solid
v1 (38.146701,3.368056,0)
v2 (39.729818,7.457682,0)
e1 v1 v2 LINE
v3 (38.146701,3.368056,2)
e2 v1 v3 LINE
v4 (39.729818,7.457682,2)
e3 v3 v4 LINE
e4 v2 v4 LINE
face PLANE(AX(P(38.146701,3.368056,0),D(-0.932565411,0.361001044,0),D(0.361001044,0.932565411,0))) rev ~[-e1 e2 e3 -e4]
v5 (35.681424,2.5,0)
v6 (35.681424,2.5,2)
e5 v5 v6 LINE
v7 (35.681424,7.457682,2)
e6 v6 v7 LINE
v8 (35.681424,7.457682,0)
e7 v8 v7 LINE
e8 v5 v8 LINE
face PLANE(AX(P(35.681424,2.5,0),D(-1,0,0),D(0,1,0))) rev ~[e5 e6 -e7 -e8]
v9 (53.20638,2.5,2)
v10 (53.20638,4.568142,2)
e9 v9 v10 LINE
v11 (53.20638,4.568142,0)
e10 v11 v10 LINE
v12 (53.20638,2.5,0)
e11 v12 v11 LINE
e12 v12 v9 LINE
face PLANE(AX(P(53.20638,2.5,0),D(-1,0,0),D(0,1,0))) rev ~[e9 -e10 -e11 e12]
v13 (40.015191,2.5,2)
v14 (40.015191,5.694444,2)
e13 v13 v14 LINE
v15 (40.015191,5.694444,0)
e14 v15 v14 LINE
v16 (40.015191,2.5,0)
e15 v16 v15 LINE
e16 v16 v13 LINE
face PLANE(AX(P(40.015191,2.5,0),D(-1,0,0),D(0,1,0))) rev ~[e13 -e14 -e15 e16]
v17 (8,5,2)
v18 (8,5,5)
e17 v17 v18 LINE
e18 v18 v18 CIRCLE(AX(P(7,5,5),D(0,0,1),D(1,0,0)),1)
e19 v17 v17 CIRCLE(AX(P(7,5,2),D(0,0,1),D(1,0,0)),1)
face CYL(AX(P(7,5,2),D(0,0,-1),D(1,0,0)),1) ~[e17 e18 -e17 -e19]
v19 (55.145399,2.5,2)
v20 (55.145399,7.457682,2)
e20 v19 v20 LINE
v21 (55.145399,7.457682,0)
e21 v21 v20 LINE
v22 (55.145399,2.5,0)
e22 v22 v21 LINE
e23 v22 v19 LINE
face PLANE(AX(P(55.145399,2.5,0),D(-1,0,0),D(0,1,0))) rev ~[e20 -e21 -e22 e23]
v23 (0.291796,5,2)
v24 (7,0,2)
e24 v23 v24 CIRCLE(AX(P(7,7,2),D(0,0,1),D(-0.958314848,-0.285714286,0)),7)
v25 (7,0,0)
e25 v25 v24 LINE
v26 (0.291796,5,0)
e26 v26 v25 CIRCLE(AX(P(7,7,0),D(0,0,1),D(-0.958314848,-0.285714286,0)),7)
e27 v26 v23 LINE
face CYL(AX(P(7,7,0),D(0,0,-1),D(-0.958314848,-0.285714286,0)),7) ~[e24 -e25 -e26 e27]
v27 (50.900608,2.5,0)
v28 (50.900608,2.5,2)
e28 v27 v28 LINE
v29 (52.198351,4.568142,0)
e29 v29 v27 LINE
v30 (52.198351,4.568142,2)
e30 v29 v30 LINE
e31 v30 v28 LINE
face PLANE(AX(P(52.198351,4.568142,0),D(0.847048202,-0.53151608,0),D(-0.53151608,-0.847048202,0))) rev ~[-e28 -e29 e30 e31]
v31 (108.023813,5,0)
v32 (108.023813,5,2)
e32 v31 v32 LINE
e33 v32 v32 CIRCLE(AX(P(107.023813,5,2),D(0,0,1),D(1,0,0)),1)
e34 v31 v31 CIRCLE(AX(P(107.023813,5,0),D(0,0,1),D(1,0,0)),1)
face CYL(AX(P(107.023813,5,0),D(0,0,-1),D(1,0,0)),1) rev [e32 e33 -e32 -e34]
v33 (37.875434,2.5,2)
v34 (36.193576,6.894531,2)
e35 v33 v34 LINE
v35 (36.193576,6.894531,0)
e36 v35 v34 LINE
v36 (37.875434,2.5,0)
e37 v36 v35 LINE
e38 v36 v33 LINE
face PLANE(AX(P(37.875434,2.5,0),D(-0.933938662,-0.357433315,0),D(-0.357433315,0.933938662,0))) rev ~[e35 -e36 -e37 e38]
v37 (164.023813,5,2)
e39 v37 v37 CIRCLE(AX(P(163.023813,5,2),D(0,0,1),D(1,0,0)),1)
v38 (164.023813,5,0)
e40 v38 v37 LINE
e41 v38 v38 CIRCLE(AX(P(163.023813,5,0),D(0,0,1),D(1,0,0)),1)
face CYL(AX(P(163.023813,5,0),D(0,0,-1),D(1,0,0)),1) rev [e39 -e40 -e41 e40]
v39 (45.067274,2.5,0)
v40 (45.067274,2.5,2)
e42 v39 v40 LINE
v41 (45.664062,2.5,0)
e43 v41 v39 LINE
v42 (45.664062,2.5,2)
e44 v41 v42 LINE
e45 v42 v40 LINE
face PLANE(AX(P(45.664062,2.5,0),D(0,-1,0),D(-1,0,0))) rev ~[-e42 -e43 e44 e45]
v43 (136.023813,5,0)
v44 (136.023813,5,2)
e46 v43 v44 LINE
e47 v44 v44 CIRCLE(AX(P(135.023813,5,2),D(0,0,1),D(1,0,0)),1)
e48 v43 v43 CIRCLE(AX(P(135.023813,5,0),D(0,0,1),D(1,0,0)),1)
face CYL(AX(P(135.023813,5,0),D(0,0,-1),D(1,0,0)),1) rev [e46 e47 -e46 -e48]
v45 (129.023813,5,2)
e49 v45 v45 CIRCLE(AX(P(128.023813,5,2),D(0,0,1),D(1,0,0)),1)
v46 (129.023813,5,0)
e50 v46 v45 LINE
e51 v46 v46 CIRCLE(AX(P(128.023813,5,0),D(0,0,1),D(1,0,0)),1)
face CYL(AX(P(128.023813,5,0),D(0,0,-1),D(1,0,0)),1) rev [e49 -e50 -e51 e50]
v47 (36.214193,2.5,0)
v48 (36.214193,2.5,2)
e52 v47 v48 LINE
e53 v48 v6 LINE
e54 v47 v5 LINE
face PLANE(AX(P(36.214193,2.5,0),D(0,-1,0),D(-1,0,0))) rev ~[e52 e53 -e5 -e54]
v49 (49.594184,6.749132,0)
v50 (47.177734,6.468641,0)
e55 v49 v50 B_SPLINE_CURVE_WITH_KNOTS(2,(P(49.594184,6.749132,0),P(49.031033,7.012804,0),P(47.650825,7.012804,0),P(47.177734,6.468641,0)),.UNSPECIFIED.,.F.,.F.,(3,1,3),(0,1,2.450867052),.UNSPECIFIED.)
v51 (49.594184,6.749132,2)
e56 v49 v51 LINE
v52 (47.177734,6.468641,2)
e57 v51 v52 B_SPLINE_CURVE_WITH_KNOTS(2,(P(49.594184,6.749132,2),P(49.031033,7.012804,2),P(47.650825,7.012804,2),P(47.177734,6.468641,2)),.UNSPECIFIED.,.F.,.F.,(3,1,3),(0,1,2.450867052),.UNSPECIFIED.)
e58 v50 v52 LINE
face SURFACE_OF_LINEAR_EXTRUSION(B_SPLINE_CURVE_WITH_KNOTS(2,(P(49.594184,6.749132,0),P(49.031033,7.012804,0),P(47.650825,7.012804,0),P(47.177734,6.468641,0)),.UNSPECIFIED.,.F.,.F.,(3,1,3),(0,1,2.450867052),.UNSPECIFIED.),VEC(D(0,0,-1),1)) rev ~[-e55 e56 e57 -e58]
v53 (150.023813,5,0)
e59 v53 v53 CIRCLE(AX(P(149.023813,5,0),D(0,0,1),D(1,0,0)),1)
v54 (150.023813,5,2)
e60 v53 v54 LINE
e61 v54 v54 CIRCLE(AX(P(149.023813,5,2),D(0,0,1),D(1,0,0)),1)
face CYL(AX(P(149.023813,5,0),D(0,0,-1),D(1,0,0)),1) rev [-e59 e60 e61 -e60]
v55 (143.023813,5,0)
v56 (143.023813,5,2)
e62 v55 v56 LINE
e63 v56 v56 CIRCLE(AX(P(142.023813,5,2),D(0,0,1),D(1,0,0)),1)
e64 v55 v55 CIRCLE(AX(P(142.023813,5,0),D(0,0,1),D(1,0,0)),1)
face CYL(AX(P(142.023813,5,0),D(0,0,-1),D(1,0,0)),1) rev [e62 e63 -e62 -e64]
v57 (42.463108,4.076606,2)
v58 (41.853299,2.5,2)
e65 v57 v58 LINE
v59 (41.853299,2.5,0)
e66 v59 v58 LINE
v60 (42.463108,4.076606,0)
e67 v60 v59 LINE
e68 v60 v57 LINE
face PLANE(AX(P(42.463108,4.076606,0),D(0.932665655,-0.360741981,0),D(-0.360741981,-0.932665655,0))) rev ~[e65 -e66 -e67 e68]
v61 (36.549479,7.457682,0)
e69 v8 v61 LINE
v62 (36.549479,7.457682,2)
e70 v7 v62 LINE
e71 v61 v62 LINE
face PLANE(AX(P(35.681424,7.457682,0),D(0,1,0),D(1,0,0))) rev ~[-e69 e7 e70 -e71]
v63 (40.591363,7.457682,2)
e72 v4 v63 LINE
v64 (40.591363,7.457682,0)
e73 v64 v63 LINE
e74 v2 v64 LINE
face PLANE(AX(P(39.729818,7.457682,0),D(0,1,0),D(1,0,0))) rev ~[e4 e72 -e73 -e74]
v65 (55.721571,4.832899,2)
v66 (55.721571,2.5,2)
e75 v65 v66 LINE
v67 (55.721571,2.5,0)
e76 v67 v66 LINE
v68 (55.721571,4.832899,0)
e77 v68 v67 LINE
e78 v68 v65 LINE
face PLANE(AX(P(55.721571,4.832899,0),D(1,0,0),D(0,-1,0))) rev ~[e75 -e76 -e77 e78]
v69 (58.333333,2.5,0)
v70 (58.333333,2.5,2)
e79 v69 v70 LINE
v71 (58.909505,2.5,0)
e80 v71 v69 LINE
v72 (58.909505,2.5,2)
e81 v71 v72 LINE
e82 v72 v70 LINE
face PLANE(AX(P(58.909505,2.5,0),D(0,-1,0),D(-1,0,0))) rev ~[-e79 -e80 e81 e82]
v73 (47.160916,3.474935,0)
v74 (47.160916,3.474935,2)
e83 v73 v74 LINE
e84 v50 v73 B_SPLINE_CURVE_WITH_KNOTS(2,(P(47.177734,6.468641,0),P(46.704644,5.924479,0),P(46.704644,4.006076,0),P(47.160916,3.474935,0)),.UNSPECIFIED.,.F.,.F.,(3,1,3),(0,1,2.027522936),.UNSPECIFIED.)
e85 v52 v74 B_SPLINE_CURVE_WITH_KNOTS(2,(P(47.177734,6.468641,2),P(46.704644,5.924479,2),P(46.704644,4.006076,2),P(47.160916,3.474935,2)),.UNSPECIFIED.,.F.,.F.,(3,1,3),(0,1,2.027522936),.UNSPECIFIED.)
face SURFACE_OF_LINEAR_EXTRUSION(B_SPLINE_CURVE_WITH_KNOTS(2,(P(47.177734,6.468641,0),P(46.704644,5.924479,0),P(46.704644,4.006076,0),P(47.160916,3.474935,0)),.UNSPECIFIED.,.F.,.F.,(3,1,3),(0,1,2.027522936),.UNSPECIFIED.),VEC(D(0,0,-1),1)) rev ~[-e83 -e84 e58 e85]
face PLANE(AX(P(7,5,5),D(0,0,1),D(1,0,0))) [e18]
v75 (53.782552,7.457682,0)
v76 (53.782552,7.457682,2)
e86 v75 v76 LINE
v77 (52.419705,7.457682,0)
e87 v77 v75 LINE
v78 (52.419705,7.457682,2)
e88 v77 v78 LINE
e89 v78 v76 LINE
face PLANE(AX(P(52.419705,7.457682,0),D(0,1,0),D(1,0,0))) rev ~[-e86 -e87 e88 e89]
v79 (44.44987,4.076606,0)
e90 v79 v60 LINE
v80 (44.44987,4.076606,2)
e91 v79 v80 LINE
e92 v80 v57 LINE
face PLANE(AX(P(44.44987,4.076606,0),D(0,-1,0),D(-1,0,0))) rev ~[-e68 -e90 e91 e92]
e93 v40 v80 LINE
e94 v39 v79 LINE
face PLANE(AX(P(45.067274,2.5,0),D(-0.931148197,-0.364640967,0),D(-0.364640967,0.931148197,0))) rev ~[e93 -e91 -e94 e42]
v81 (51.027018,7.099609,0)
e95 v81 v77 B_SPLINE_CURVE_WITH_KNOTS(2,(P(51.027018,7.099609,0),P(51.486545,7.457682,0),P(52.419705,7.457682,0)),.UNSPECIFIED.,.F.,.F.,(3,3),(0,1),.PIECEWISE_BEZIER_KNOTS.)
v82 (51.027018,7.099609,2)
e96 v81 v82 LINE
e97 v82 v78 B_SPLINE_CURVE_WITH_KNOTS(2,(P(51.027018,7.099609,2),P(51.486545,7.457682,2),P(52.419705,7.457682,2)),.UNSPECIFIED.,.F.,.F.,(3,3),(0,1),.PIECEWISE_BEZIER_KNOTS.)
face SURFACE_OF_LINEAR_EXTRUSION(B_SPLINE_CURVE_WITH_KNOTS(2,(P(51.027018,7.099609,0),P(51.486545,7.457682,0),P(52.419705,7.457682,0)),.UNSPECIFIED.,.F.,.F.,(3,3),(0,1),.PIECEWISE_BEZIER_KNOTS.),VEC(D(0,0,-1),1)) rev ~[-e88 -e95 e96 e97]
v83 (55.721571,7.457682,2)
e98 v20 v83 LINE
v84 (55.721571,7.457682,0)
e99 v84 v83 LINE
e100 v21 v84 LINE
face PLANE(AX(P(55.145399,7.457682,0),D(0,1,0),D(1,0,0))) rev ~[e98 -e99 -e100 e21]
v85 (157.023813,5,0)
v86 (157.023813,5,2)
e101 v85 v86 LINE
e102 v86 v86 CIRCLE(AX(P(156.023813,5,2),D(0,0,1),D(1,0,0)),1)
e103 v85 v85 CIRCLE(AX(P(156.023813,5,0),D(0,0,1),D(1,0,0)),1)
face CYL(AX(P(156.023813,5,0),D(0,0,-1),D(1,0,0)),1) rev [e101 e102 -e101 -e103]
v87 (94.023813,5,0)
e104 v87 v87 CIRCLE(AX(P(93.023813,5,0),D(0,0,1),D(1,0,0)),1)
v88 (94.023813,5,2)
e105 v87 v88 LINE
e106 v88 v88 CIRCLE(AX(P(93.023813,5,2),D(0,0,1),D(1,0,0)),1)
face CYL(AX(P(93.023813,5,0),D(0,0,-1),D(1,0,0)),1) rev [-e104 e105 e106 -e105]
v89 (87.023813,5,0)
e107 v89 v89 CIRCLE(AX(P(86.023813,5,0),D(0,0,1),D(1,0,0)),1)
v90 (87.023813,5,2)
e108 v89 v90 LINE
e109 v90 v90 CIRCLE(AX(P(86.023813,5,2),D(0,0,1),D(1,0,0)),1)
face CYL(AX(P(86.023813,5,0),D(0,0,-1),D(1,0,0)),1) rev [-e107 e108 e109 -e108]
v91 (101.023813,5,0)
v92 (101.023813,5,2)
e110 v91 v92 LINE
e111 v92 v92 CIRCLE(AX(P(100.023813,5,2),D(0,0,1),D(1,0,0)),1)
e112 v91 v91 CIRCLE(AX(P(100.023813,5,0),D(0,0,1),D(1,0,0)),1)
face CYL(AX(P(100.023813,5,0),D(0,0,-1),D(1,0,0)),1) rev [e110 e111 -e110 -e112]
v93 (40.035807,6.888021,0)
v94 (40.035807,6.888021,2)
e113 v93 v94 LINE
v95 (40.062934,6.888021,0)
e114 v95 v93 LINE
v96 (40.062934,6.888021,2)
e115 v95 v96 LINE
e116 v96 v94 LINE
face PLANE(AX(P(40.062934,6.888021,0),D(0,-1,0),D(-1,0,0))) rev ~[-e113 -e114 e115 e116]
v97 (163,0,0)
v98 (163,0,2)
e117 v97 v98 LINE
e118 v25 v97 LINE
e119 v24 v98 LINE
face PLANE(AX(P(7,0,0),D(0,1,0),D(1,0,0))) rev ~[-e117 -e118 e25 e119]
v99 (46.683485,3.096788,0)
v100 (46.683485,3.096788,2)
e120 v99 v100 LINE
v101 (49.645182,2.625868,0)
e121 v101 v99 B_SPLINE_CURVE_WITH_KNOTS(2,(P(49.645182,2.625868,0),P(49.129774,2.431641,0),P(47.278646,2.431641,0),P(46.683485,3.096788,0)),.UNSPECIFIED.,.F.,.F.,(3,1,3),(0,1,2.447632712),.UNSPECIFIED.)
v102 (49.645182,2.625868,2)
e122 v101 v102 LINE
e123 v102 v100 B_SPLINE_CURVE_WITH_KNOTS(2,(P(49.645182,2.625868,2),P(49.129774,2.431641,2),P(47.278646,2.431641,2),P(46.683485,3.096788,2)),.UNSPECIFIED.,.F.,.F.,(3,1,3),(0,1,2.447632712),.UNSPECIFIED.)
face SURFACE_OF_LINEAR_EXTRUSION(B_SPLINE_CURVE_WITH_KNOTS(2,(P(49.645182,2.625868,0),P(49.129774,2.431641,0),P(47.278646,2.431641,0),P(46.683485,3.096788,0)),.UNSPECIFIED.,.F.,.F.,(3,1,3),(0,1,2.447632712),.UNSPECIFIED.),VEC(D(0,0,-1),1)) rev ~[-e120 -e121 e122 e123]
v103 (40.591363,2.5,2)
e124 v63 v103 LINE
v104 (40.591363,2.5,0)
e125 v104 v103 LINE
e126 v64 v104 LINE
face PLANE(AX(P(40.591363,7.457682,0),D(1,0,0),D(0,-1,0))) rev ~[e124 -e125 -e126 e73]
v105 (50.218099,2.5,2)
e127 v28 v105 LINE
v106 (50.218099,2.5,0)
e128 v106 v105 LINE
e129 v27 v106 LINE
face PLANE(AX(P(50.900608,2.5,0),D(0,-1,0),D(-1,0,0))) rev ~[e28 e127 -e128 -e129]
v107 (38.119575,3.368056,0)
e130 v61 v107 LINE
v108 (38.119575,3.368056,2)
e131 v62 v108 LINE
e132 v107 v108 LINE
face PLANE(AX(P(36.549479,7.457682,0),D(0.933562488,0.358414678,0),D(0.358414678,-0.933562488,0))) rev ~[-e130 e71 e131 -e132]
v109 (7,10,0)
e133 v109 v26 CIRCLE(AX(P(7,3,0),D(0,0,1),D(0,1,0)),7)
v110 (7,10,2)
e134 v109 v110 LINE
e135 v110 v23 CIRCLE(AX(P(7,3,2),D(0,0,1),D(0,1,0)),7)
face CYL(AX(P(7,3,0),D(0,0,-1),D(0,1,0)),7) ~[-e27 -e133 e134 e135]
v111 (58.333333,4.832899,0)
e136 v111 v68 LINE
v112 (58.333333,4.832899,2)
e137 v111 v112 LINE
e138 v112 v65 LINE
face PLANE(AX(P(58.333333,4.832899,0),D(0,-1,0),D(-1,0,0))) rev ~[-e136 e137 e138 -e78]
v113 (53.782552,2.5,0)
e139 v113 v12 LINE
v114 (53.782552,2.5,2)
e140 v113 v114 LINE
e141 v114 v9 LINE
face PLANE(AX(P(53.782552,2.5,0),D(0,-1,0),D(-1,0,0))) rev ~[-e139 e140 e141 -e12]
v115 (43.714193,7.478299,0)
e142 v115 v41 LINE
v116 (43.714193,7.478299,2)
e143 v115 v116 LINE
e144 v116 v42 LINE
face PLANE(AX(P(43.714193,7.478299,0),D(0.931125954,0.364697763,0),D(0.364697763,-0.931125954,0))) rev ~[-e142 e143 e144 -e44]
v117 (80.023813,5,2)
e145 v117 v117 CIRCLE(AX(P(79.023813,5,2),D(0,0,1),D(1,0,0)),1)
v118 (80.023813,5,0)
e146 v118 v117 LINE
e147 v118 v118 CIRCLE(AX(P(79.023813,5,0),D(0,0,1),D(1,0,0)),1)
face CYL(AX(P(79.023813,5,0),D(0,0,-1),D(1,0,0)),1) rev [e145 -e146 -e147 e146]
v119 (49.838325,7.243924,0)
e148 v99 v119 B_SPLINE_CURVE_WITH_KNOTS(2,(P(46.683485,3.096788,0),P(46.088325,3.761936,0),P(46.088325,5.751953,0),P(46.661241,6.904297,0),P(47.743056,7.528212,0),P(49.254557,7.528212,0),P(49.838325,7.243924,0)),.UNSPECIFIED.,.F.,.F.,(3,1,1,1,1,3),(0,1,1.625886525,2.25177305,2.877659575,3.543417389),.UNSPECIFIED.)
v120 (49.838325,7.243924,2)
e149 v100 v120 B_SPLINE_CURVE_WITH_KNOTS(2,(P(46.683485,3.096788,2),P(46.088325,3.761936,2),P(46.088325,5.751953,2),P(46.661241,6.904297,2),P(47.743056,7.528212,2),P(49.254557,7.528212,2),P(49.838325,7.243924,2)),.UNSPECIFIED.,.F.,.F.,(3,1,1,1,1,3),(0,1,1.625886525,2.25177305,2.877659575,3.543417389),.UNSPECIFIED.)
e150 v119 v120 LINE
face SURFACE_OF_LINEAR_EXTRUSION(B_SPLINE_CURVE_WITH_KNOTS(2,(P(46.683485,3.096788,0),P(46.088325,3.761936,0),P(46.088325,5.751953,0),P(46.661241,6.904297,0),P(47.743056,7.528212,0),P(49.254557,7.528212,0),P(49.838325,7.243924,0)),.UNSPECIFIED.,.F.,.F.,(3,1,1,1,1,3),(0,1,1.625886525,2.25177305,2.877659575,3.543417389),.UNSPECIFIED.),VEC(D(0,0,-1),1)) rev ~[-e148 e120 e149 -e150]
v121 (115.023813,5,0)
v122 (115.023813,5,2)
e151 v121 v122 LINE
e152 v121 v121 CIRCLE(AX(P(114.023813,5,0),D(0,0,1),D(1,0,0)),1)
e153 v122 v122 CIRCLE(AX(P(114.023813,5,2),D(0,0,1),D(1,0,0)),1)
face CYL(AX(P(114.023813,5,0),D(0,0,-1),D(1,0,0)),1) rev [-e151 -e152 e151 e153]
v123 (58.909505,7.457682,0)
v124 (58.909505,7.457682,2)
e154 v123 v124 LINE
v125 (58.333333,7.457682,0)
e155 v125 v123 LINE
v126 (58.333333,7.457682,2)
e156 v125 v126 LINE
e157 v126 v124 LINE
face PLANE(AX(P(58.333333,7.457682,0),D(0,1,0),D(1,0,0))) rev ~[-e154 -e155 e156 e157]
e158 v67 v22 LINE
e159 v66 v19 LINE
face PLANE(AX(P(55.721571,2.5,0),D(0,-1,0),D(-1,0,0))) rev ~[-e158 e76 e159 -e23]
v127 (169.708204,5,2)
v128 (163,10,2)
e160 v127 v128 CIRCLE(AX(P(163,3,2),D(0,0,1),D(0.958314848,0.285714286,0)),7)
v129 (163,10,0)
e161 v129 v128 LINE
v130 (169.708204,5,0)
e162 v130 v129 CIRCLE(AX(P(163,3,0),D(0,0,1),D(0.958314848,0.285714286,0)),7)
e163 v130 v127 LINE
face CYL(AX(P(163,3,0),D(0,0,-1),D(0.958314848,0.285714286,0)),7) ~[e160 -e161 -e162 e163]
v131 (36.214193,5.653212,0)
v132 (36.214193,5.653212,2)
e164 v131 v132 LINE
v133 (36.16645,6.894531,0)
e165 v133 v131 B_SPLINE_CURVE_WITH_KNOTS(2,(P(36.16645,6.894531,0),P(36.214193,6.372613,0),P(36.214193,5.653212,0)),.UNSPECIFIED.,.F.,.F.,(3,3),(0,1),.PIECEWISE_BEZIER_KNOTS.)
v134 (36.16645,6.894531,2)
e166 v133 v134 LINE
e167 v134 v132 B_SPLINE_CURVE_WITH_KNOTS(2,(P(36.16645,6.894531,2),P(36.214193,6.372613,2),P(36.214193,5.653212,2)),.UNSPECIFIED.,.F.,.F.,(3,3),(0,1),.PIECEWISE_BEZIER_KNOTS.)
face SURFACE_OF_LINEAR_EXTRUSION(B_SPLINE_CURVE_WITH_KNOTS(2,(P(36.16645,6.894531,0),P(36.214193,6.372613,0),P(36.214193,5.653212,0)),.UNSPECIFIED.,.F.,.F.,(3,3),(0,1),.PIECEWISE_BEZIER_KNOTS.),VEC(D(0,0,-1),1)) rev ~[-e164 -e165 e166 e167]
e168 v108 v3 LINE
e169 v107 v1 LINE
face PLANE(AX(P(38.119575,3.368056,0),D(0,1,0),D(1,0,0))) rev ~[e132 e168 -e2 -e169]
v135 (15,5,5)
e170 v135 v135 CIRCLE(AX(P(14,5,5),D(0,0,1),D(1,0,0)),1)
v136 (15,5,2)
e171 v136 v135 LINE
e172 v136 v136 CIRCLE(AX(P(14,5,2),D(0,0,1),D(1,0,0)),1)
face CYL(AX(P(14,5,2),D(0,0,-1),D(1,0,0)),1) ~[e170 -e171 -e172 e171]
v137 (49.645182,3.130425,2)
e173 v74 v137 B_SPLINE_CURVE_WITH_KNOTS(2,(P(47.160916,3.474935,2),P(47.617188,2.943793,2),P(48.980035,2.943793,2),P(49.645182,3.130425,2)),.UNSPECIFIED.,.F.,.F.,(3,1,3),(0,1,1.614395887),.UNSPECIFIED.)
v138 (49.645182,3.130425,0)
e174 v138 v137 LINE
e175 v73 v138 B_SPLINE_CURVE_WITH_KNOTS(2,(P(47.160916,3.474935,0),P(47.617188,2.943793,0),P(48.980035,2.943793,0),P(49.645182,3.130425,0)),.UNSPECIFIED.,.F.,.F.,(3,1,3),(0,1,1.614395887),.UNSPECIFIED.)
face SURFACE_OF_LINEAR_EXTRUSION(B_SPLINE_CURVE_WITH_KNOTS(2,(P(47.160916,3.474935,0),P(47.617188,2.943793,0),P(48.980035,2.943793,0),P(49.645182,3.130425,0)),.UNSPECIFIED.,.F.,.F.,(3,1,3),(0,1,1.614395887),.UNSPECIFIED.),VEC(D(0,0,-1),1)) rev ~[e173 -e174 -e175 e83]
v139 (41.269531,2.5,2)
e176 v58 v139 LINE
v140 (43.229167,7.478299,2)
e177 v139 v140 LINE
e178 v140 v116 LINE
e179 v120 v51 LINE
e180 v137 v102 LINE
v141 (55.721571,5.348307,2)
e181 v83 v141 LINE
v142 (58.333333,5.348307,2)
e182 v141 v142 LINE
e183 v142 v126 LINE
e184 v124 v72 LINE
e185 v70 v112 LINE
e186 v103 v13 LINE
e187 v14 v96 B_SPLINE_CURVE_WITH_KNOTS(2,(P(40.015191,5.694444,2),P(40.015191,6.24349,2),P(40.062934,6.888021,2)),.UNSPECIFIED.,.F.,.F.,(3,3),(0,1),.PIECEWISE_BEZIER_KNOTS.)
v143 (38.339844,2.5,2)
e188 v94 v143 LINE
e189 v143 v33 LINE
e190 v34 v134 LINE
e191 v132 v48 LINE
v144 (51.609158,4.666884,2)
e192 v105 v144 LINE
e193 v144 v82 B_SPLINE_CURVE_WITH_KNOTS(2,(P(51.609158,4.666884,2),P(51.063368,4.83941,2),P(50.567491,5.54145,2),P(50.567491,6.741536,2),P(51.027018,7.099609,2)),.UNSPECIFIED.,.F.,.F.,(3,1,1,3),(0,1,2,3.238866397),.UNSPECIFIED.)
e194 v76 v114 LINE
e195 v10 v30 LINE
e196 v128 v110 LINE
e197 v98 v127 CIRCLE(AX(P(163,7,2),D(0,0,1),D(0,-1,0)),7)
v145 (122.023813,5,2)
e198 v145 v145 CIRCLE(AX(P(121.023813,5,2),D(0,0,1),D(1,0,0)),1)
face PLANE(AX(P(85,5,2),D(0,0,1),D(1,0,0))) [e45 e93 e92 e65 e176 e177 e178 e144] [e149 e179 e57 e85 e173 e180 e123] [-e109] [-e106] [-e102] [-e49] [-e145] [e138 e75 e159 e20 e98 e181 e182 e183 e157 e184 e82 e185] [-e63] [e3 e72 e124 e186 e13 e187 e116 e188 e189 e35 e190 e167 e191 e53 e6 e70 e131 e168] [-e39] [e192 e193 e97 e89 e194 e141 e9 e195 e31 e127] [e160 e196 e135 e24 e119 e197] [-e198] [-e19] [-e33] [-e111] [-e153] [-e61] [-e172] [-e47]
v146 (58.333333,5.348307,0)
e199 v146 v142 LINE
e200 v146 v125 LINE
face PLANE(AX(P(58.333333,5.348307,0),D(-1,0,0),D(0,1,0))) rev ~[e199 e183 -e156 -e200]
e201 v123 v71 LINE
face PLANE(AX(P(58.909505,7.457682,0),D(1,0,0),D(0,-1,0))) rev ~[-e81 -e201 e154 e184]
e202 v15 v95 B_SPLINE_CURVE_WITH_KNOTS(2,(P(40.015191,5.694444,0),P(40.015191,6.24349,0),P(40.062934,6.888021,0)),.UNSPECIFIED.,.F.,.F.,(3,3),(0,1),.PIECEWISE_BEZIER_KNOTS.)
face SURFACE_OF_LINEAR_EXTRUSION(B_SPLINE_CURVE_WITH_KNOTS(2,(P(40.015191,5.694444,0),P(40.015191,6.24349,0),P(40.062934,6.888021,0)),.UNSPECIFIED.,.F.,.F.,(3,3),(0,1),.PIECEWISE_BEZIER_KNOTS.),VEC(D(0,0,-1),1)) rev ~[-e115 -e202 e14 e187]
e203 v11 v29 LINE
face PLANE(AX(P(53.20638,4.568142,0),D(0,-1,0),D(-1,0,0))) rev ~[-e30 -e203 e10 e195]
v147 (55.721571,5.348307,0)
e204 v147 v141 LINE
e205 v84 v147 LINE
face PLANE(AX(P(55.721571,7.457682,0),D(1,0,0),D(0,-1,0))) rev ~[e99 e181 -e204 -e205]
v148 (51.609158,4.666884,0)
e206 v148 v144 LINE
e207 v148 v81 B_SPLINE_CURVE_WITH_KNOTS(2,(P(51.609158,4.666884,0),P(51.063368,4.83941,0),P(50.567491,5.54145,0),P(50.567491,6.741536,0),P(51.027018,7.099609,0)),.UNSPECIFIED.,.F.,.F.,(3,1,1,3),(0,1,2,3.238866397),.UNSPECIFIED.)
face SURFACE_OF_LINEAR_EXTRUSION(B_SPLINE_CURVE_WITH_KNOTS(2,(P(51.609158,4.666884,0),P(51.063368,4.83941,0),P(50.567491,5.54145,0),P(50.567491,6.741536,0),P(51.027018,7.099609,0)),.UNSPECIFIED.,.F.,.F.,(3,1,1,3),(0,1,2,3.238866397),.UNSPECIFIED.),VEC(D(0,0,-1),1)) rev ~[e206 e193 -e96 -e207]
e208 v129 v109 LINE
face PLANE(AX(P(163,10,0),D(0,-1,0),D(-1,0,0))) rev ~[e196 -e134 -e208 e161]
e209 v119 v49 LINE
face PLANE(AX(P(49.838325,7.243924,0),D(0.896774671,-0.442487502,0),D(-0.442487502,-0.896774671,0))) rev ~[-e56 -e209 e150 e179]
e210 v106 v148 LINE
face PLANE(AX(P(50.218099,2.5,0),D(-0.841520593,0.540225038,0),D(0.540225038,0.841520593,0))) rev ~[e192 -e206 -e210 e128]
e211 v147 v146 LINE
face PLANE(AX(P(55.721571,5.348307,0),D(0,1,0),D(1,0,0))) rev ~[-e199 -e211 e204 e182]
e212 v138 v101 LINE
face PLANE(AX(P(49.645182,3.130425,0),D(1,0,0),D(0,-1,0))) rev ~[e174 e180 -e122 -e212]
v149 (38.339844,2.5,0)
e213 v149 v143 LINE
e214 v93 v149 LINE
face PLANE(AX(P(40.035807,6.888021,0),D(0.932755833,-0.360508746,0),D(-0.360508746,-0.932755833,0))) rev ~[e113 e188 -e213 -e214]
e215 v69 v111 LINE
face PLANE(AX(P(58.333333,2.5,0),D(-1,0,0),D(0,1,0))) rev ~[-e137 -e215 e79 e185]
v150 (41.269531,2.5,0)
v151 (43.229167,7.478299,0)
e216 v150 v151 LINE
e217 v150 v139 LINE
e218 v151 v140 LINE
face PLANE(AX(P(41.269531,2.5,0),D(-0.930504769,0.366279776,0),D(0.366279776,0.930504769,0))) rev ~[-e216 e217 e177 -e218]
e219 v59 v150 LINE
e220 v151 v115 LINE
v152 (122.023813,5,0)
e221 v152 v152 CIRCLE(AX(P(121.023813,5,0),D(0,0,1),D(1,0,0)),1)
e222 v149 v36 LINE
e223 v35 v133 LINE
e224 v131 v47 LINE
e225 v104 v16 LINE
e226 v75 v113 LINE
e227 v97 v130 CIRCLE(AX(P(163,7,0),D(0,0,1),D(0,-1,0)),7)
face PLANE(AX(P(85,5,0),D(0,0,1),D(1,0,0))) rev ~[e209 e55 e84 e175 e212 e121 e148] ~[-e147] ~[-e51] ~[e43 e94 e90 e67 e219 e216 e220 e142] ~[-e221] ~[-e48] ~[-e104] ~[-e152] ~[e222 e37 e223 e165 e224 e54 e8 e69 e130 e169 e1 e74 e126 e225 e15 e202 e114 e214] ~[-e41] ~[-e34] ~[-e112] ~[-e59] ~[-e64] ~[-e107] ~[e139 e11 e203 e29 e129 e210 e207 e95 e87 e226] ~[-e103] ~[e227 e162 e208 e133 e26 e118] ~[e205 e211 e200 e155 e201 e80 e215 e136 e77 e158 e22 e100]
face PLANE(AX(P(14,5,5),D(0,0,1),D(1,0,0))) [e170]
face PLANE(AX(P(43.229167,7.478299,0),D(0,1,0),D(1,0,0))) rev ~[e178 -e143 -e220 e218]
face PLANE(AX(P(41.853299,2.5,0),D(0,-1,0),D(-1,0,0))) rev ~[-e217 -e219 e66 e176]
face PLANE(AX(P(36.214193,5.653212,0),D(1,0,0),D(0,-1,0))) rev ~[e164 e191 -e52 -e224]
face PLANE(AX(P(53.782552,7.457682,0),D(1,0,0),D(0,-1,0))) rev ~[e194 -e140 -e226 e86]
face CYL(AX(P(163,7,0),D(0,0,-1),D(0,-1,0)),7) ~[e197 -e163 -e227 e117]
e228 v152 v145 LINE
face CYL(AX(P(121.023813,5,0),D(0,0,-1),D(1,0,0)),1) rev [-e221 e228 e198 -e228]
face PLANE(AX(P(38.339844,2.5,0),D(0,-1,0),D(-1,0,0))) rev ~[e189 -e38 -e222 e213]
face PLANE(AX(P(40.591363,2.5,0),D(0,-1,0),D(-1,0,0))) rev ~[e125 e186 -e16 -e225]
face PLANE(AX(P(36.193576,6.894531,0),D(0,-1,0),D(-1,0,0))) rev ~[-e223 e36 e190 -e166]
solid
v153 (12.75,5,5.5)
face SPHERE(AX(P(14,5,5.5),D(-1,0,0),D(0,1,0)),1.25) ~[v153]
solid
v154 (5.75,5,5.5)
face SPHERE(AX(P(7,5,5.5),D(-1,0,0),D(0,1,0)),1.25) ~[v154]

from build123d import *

# Parameters (mm, degrees)
F0_R     = 1
F1_DEPTH = 2
F2_R     = 1
F3_DEPTH = 3


# Not quite as in the source:
# - a feature names something its author has since deleted; it is built from what else it names


with BuildPart() as f1:
    # F0 (on Top) → F1 (new body)
    with BuildSketch(Plane.XY):
        with BuildLine():
            ThreePointArc((0.2917960675, 5), (2.8166998673, 1.3875139198), (7, 0))
            Line((7, 0), (163, 0))
            ThreePointArc((163, 0), (167.1833001327, 1.3875139198), (169.7082039325, 5))
            ThreePointArc((169.7082039325, 5), (167.1833001327, 8.6124860802), (163, 10))
            Line((163, 10), (7, 10))
            ThreePointArc((7, 10), (2.8166998673, 8.6124860802), (0.2917960675, 5))
        make_face()
        with BuildLine():
            Line((38.33984375, 2.5), (37.8754340278, 2.5))
            Line((37.8754340278, 2.5), (36.1935763889, 6.89453125))
            Line((36.1935763889, 6.89453125), (36.1664496528, 6.89453125))
            add(Edge.make_bspline(
                [(36.1664496528, 6.89453125), (36.2141927083, 6.3726128472), (36.2141927083, 5.6532118056)],
                knots=[0, 0, 0, 1, 1, 1], degree=2))
            Line((36.2141927083, 5.6532118056), (36.2141927083, 2.5))
            Line((36.2141927083, 2.5), (35.6814236111, 2.5))
            Line((35.6814236111, 2.5), (35.6814236111, 7.4576822917))
            Line((35.6814236111, 7.4576822917), (36.5494791667, 7.4576822917))
            Line((36.5494791667, 7.4576822917), (38.1195746528, 3.3680555556))
            Line((38.1195746528, 3.3680555556), (38.1467013889, 3.3680555556))
            Line((38.1467013889, 3.3680555556), (39.7298177083, 7.4576822917))
            Line((39.7298177083, 7.4576822917), (40.5913628472, 7.4576822917))
            Line((40.5913628472, 7.4576822917), (40.5913628472, 2.5))
            Line((40.5913628472, 2.5), (40.0151909722, 2.5))
            Line((40.0151909722, 2.5), (40.0151909722, 5.6944444444))
            add(Edge.make_bspline(
                [(40.0151909722, 5.6944444444), (40.0151909722, 6.2434895833), (40.0629340278, 6.8880208333)],
                knots=[0, 0, 0, 1, 1, 1], degree=2))
            Line((40.0629340278, 6.8880208333), (40.0358072917, 6.8880208333))
            Line((40.0358072917, 6.8880208333), (38.33984375, 2.5))
        make_face(mode=Mode.SUBTRACT)
        Polygon((45.6640625, 2.5), (45.0672743056, 2.5), (44.4498697917, 4.0766059028), (42.4631076389, 4.0766059028), (41.8532986111, 2.5), (41.26953125, 2.5), (43.2291666667, 7.4782986111), (43.7141927083, 7.4782986111), align=None, mode=Mode.SUBTRACT)
        with BuildLine():
            add(Edge.make_bspline(
                [(49.5941840278, 6.7491319444), (49.0310329861, 7.0128038194), (48.4678819444, 7.0128038194)],
                knots=[0, 0, 0, 1, 1, 1], degree=2))
            add(Edge.make_bspline(
                [(48.4678819444, 7.0128038194), (47.6508246528, 7.0128038194), (47.177734375, 6.4686414931)],
                knots=[0, 0, 0, 1, 1, 1], degree=2))
            add(Edge.make_bspline(
                [(47.177734375, 6.4686414931), (46.7046440972, 5.9244791667), (46.7046440972, 4.9782986111)],
                knots=[0, 0, 0, 1, 1, 1], degree=2))
            add(Edge.make_bspline(
                [(46.7046440972, 4.9782986111), (46.7046440972, 4.0060763889), (47.1609157986, 3.4749348958)],
                knots=[0, 0, 0, 1, 1, 1], degree=2))
            add(Edge.make_bspline(
                [(47.1609157986, 3.4749348958), (47.6171875, 2.9437934028), (48.4613715278, 2.9437934028)],
                knots=[0, 0, 0, 1, 1, 1], degree=2))
            add(Edge.make_bspline(
                [(48.4613715278, 2.9437934028), (48.9800347222, 2.9437934028), (49.6451822917, 3.1304253472)],
                knots=[0, 0, 0, 1, 1, 1], degree=2))
            Line((49.6451822917, 3.1304253472), (49.6451822917, 2.6258680556))
            add(Edge.make_bspline(
                [(49.6451822917, 2.6258680556), (49.1297743056, 2.431640625), (48.3734809028, 2.431640625)],
                knots=[0, 0, 0, 1, 1, 1], degree=2))
            add(Edge.make_bspline(
                [(48.3734809028, 2.431640625), (47.2786458333, 2.431640625), (46.6834852431, 3.0967881944)],
                knots=[0, 0, 0, 1, 1, 1], degree=2))
            add(Edge.make_bspline(
                [(46.6834852431, 3.0967881944), (46.0883246528, 3.7619357639), (46.0883246528, 4.9858940972)],
                knots=[0, 0, 0, 1, 1, 1], degree=2))
            add(Edge.make_bspline(
                [(46.0883246528, 4.9858940972), (46.0883246528, 5.751953125), (46.3747829861, 6.328125)],
                knots=[0, 0, 0, 1, 1, 1], degree=2))
            add(Edge.make_bspline(
                [(46.3747829861, 6.328125), (46.6612413194, 6.904296875), (47.2021484375, 7.2162543403)],
                knots=[0, 0, 0, 1, 1, 1], degree=2))
            add(Edge.make_bspline(
                [(47.2021484375, 7.2162543403), (47.7430555556, 7.5282118056), (48.4754774306, 7.5282118056)],
                knots=[0, 0, 0, 1, 1, 1], degree=2))
            add(Edge.make_bspline(
                [(48.4754774306, 7.5282118056), (49.2545572917, 7.5282118056), (49.8383246528, 7.2439236111)],
                knots=[0, 0, 0, 1, 1, 1], degree=2))
            Line((49.8383246528, 7.2439236111), (49.5941840278, 6.7491319444))
        make_face(mode=Mode.SUBTRACT)
        with BuildLine():
            Line((53.2063802083, 4.5681423611), (52.1983506944, 4.5681423611))
            Line((52.1983506944, 4.5681423611), (50.9006076389, 2.5))
            Line((50.9006076389, 2.5), (50.2180989583, 2.5))
            Line((50.2180989583, 2.5), (51.6091579861, 4.6668836806))
            add(Edge.make_bspline(
                [(51.6091579861, 4.6668836806), (51.0633680556, 4.8394097222), (50.8154296875, 5.1904296875)],
                knots=[0, 0, 0, 1, 1, 1], degree=2))
            add(Edge.make_bspline(
                [(50.8154296875, 5.1904296875), (50.5674913194, 5.5414496528), (50.5674913194, 6.0774739583)],
                knots=[0, 0, 0, 1, 1, 1], degree=2))
            add(Edge.make_bspline(
                [(50.5674913194, 6.0774739583), (50.5674913194, 6.7415364583), (51.0270182292, 7.099609375)],
                knots=[0, 0, 0, 1, 1, 1], degree=2))
            add(Edge.make_bspline(
                [(51.0270182292, 7.099609375), (51.4865451389, 7.4576822917), (52.4197048611, 7.4576822917)],
                knots=[0, 0, 0, 1, 1, 1], degree=2))
            Line((52.4197048611, 7.4576822917), (53.7825520833, 7.4576822917))
            Line((53.7825520833, 7.4576822917), (53.7825520833, 2.5))
            Line((53.7825520833, 2.5), (53.2063802083, 2.5))
            Line((53.2063802083, 2.5), (53.2063802083, 4.5681423611))
        make_face(mode=Mode.SUBTRACT)
        Polygon((58.9095052083, 7.4576822917), (58.9095052083, 2.5), (58.3333333333, 2.5), (58.3333333333, 4.8328993056), (55.7215711806, 4.8328993056), (55.7215711806, 2.5), (55.1453993056, 2.5), (55.1453993056, 7.4576822917), (55.7215711806, 7.4576822917), (55.7215711806, 5.3483072917), (58.3333333333, 5.3483072917), (58.3333333333, 7.4576822917), align=None, mode=Mode.SUBTRACT)
        with Locations((79.0238128991, 5)):
            Circle(F0_R, mode=Mode.SUBTRACT)
        with Locations((86.0238128991, 5)):
            Circle(F0_R, mode=Mode.SUBTRACT)
        with Locations((93.0238128991, 5)):
            Circle(F0_R, mode=Mode.SUBTRACT)
        with Locations((100.0238128991, 5)):
            Circle(F0_R, mode=Mode.SUBTRACT)
        with Locations((107.0238128991, 5)):
            Circle(F0_R, mode=Mode.SUBTRACT)
        with Locations((114.0238128991, 5)):
            Circle(F0_R, mode=Mode.SUBTRACT)
        with Locations((121.0238128991, 5)):
            Circle(F0_R, mode=Mode.SUBTRACT)
        with Locations((128.0238128991, 5)):
            Circle(F0_R, mode=Mode.SUBTRACT)
        with Locations((135.0238128991, 5)):
            Circle(F0_R, mode=Mode.SUBTRACT)
        with Locations((142.0238128991, 5)):
            Circle(F0_R, mode=Mode.SUBTRACT)
        with Locations((149.0238128991, 5)):
            Circle(F0_R, mode=Mode.SUBTRACT)
        with Locations((156.0238128991, 5)):
            Circle(F0_R, mode=Mode.SUBTRACT)
        with Locations((163.0238128991, 5)):
            Circle(F0_R, mode=Mode.SUBTRACT)
    extrude(amount=F1_DEPTH)

    # F2 (on face) → F3 (join)
    with BuildSketch(Plane.XY.offset(2)):
        with Locations((7, 5)):
            Circle(F2_R)
        with Locations((14, 5)):
            Circle(F2_R)
    extrude(amount=F3_DEPTH)


with BuildPart() as f1b:
    # F0 (on Top) → F1, piece 2 (new body)
    with BuildSketch(Plane.XY):
        with BuildLine():
            ThreePointArc((0, 3), (0.0733331419, 4.010587075), (0.2917960675, 5))
            ThreePointArc((0.2917960675, 5), (0.0733331419, 5.989412925), (0, 7))
            Line((0, 7), (0, 3))
        make_face()
    extrude(amount=F1_DEPTH)


with BuildPart() as f1c:
    # F0 (on Top) → F1, piece 3 (new body)
    with BuildSketch(Plane.XY):
        with BuildLine():
            ThreePointArc((170, 7), (169.9266668581, 5.989412925), (169.7082039325, 5))
            ThreePointArc((169.7082039325, 5), (169.9266668581, 4.010587075), (170, 3))
            Line((170, 3), (170, 7))
        make_face()
    extrude(amount=F1_DEPTH)


with BuildPart() as f7:
    # F6 (on offset) → F7 (revolve)
    with BuildSketch(Plane.XY.offset(5.5)):
        with BuildLine():
            Line((5.75, 5), (8.25, 5))
            ThreePointArc((8.25, 5), (7, 6.25), (5.75, 5))
        make_face()
    revolve(axis=Axis((7, 5, 5.5), (1, 0, 0)))


with BuildPart() as f9:
    # F8 (on offset) → F9 (revolve)
    with BuildSketch(Plane.XY.offset(5.5)):
        with BuildLine():
            Line((12.75, 5), (15.25, 5))
            ThreePointArc((15.25, 5), (14, 6.25), (12.75, 5))
        make_face()
    revolve(axis=Axis((14, 5, 5.5), (1, 0, 0)))


solid = Compound([f1.part, f7.part, f9.part])
